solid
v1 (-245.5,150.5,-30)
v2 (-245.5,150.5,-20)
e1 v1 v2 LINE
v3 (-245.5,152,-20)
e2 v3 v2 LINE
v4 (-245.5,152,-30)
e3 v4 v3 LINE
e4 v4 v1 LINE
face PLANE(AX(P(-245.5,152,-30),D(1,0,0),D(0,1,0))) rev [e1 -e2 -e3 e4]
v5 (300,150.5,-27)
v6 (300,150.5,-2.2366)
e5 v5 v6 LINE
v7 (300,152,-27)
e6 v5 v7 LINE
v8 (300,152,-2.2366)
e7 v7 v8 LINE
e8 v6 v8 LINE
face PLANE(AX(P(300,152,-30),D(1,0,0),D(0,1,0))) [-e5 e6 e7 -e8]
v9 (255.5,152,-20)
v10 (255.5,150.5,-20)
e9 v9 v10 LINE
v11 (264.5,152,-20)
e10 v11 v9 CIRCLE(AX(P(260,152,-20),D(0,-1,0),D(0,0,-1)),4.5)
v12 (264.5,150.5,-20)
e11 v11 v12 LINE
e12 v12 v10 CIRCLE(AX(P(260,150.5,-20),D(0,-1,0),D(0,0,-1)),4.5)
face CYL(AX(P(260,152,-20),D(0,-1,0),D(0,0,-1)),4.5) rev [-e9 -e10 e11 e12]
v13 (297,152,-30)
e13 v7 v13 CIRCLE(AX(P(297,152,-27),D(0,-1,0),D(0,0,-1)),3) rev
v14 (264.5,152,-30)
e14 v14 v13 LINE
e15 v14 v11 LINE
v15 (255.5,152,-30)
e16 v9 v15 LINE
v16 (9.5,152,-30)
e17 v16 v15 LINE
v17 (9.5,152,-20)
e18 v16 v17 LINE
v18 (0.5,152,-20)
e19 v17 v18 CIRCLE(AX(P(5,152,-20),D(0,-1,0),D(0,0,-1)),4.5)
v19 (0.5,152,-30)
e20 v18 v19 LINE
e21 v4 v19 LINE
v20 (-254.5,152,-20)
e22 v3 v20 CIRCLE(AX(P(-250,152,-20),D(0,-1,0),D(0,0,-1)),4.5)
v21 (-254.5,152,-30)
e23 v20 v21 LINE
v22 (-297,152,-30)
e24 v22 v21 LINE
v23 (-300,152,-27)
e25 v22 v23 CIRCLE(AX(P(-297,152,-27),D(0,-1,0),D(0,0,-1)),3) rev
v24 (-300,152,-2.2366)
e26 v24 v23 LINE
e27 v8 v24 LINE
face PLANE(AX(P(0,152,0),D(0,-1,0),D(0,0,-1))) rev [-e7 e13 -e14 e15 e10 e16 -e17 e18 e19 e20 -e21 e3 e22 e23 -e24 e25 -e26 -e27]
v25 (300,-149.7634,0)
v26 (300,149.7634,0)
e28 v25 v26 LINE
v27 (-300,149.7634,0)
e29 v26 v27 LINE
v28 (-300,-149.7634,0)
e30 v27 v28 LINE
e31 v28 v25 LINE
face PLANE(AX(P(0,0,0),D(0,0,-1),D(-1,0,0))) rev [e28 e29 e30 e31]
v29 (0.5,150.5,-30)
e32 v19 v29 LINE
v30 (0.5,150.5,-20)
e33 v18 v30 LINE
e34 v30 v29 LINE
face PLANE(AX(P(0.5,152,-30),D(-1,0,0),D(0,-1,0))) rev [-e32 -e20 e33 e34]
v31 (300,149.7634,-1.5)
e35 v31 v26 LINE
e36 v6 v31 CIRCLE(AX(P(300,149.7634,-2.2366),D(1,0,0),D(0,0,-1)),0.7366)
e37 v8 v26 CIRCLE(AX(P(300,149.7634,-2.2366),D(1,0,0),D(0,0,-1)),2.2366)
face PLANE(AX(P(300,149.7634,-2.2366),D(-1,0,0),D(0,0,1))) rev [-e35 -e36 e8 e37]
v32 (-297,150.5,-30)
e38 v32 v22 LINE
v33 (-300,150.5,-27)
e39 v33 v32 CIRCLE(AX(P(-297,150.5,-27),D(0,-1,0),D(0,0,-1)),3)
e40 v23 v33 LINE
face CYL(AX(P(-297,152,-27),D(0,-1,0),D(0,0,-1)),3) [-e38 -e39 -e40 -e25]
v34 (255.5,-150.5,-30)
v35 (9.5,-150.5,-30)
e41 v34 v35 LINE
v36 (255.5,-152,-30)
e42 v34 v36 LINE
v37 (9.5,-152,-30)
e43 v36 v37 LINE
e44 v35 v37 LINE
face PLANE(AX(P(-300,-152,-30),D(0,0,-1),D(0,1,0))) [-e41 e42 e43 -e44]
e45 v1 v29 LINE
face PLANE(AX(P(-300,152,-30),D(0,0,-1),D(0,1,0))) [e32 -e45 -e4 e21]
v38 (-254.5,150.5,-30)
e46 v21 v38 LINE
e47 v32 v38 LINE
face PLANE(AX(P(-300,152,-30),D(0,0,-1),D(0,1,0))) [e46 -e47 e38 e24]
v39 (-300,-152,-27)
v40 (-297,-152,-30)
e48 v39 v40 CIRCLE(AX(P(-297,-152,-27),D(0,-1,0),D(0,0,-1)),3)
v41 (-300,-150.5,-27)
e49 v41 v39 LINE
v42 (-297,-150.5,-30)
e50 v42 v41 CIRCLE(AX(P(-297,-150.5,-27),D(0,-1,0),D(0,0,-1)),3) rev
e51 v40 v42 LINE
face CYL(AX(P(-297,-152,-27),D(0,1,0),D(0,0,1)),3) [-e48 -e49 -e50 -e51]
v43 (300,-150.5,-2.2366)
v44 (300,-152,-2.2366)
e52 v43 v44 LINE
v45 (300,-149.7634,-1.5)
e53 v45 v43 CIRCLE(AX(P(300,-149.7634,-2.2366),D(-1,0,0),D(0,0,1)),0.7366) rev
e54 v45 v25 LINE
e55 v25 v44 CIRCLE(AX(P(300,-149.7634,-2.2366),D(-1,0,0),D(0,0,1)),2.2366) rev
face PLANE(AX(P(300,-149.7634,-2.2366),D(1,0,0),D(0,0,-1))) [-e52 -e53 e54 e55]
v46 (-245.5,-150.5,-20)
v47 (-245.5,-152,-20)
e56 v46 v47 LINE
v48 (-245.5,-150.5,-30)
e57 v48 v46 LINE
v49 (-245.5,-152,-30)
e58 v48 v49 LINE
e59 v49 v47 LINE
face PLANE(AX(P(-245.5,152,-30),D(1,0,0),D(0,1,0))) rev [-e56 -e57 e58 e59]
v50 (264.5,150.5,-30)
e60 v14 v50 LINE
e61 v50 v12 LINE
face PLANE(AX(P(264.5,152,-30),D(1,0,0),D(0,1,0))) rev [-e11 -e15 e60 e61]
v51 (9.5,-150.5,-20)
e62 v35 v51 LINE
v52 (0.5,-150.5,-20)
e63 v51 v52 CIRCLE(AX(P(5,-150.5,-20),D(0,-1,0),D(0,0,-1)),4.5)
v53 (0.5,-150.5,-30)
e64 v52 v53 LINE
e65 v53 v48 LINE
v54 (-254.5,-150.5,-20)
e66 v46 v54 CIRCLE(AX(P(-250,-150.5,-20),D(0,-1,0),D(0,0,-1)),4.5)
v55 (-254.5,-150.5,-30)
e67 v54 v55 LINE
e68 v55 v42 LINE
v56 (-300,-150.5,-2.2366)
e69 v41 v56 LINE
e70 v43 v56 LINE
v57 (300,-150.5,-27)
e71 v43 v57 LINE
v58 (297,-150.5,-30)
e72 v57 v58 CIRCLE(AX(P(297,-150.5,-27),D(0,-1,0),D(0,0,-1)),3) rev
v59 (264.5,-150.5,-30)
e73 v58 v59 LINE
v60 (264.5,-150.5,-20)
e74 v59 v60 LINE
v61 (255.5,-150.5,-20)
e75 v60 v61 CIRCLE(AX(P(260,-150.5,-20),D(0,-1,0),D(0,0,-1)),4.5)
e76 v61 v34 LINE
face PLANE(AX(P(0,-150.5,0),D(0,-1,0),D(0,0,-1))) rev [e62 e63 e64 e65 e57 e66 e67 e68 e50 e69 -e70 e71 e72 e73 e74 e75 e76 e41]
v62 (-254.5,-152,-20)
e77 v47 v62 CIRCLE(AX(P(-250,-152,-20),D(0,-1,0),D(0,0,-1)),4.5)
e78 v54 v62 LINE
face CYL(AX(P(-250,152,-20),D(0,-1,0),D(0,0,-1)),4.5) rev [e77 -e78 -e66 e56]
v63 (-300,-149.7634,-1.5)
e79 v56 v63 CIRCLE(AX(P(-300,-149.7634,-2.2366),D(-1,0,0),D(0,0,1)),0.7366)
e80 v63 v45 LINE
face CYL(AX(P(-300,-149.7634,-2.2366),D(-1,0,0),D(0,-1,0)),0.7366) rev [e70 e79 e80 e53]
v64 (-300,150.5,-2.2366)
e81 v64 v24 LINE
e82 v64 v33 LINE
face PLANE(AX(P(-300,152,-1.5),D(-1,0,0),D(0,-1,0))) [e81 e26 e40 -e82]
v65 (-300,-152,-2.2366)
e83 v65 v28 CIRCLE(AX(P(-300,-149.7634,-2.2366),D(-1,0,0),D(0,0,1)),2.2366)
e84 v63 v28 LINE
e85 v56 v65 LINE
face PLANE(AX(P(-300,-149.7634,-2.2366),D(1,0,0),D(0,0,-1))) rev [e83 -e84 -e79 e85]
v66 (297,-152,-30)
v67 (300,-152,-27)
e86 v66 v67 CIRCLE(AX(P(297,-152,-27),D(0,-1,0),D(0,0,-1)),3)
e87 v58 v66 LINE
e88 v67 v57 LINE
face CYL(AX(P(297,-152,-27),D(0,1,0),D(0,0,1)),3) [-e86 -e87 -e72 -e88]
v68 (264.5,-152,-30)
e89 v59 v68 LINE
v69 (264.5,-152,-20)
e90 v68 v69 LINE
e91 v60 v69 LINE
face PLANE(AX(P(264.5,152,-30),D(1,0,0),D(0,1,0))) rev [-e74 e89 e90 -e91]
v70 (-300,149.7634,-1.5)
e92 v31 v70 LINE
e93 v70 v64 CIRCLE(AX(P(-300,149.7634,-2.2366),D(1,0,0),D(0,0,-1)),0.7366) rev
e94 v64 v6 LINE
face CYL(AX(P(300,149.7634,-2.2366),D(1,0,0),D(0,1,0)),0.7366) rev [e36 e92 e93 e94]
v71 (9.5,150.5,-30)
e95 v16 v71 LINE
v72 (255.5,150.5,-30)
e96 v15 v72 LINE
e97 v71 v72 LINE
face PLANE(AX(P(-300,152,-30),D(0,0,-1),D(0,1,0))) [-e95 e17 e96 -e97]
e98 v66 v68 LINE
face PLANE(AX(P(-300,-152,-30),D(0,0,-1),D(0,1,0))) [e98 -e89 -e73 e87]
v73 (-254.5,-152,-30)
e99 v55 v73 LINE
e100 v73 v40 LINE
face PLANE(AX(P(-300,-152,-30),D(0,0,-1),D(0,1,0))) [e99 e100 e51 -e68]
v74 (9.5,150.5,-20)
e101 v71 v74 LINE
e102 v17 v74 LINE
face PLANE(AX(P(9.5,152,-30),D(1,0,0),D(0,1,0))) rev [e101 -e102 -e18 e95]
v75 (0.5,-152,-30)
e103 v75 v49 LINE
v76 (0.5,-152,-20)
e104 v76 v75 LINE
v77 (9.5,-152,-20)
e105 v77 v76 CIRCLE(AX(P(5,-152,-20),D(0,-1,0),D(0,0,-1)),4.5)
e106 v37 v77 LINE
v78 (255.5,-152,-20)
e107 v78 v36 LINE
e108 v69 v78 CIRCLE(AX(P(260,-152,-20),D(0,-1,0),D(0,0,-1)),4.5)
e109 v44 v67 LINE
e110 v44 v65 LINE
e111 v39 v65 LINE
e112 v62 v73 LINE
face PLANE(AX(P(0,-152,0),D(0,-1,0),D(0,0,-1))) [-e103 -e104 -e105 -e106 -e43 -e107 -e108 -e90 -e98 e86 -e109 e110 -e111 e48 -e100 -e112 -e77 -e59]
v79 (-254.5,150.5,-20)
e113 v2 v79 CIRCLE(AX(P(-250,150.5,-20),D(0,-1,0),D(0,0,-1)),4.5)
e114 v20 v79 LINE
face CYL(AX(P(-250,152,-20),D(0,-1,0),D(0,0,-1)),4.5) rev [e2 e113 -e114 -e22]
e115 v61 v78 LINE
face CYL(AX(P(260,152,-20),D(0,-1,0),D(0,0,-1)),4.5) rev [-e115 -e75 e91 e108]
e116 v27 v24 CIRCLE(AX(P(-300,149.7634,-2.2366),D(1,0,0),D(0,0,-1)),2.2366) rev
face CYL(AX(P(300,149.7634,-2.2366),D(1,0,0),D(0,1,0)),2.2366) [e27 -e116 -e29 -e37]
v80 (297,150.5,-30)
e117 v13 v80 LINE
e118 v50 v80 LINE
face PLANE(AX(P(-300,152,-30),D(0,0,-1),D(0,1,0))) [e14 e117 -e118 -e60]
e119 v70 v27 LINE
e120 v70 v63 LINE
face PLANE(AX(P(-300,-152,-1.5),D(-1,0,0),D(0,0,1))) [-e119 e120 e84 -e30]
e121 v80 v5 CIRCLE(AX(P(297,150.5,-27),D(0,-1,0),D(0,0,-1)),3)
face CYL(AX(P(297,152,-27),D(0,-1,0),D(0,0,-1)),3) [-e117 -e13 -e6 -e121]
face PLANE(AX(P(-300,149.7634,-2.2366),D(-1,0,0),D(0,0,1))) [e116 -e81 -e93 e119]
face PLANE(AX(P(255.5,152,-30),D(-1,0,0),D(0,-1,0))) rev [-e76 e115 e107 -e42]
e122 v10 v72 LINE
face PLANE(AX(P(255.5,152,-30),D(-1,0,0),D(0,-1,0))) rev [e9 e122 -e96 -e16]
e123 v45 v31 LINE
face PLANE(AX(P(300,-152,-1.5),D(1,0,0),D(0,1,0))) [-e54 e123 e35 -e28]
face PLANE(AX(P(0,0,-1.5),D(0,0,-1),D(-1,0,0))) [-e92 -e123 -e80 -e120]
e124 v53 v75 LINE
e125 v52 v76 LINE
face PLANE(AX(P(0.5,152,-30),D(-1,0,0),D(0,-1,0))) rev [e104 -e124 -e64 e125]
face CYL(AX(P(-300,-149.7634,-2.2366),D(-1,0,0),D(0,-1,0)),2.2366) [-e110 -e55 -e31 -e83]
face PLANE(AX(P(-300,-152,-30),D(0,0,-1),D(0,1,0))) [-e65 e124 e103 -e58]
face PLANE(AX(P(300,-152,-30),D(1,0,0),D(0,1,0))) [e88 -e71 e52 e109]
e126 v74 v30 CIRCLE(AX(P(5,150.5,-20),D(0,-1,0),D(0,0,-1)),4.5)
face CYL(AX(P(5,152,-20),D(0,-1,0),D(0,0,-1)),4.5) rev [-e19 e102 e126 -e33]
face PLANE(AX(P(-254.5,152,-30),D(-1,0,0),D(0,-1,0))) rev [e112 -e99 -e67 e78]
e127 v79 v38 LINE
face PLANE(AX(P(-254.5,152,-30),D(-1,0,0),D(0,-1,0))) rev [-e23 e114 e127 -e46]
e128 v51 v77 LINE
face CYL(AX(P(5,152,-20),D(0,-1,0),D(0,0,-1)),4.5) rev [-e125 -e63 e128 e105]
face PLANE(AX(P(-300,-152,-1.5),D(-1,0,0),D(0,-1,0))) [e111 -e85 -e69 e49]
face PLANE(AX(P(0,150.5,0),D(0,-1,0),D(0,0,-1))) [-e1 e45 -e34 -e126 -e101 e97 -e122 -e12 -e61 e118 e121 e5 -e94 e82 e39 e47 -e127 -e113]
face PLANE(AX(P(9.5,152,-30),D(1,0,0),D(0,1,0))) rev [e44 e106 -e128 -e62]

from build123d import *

# Parameters (mm, degrees)
SKETCH_1_W                         = 600
SKETCH_1_H                         = 304
SM_BASE_FLANGE_1_DEPTH             = 1.5
SM_EDGE_FLANGE_1_STRIP_W           = 7.4732
SM_EDGE_FLANGE_1_STRIP_H           = 1.5
SM_EDGE_FLANGE_1_STRIP_CUT_DEPTH   = 600
SM_EDGE_FLANGE_1_STRIP_2_W         = 7.4732
SM_EDGE_FLANGE_1_STRIP_2_H         = 1.5
SM_EDGE_FLANGE_1_STRIP_CUT_2_DEPTH = 600
SM_EDGE_FLANGE_1_DEPTH             = 600
SM_EDGE_FLANGE_1_BEND_DEPTH        = 600
OTHER_START                        = -152
OTHER_1_DEPTH                      = 304
CUT_EXTRUDE_1_DEPTH                = 429.154177838
PATTERN_LINEAR_1_COUNT             = 3
PATTERN_LINEAR_1_PITCH             = 255


# Read off the part's stored shape, not the designer's step: 断开-边角1
# Sheet-metal steps are written as plain solids
with BuildPart() as part:
    # Sketch 1 → 基体-法兰1 (new body)
    with BuildSketch(Plane.XY):
        Rectangle(SKETCH_1_W, SKETCH_1_H)
    extrude(amount=-SM_BASE_FLANGE_1_DEPTH)

    # 边线-法兰1 strip (across the edge) → 边线-法兰1 strip cut (cut)
    with BuildSketch(Plane(origin=(300, -152, -1.5), x_dir=(0, 1, 0), z_dir=(-1, 0, 0))):
        with Locations((-1.5, -0.75)):
            Rectangle(SM_EDGE_FLANGE_1_STRIP_W, SM_EDGE_FLANGE_1_STRIP_H)
    extrude(amount=SM_EDGE_FLANGE_1_STRIP_CUT_DEPTH, mode=Mode.SUBTRACT)

    # 边线-法兰1 strip 2 (across the edge) → 边线-法兰1 strip cut 2 (cut)
    with BuildSketch(Plane(origin=(-300, 152, -1.5), x_dir=(0, -1, 0), z_dir=(1, 0, 0))):
        with Locations((-1.5, -0.75)):
            Rectangle(SM_EDGE_FLANGE_1_STRIP_2_W, SM_EDGE_FLANGE_1_STRIP_2_H)
    extrude(amount=SM_EDGE_FLANGE_1_STRIP_CUT_2_DEPTH, mode=Mode.SUBTRACT)

    # 边线-法兰1 section (across the edge) → 边线-法兰1 (add)
    with BuildSketch(Plane(origin=(300, -152, -1.5), x_dir=(0, 1, 0), z_dir=(-1, 0, 0))):
        with BuildLine():
            Line((0, 0.7366), (0, 28.5))
            Line((0, 28.5), (1.5, 28.5))
            Line((1.5, 28.5), (1.5, 0.7366))
            ThreePointArc((1.5, 0.7366), (1.715745145, 0.215745145), (2.2366, 0))
            Line((2.2366, 0), (2.2366, -1.5))
            ThreePointArc((2.2366, -1.5), (0.655084973, -0.844915027), (0, 0.7366))
        make_face()
    extrude(amount=SM_EDGE_FLANGE_1_DEPTH)

    # 边线-法兰1 section 2 (across the edge) → 边线-法兰1 bend (add)
    with BuildSketch(Plane(origin=(-300, 152, -1.5), x_dir=(0, -1, 0), z_dir=(1, 0, 0))):
        with BuildLine():
            Line((0, 0.7366), (0, 28.5))
            Line((0, 28.5), (1.5, 28.5))
            Line((1.5, 28.5), (1.5, 0.7366))
            ThreePointArc((1.5, 0.7366), (1.715745145, 0.215745145), (2.2366, 0))
            Line((2.2366, 0), (2.2366, -1.5))
            ThreePointArc((2.2366, -1.5), (0.655084973, -0.844915027), (0, 0.7366))
        make_face()
    extrude(amount=SM_EDGE_FLANGE_1_BEND_DEPTH)

    # Other 1 outline → Other 1 (cut)
    with BuildSketch(Plane(origin=(0, 0, 0), x_dir=(1, 0, 0), z_dir=(0, 1, 0)).offset(OTHER_START)):
        with BuildLine():
            Line((-300, 30), (-300, 27))
            ThreePointArc((-300, 27), (-299.121320344, 29.121320344), (-297, 30))
            Line((-297, 30), (-300, 30))
        make_face()
        with BuildLine():
            Line((300, 30), (297, 30))
            ThreePointArc((297, 30), (299.121320344, 29.121320344), (300, 27))
            Line((300, 27), (300, 30))
        make_face()
    extrude(amount=OTHER_1_DEPTH, mode=Mode.SUBTRACT)

    # 草图12 → 切除-拉伸1 (cut, symmetric)
    with BuildSketch(Plane.XZ.offset(152)):
        with BuildLine():
            Line((-254.5, -30), (-254.5, -20))
            ThreePointArc((-254.5, -20), (-250, -15.5), (-245.5, -20))
            Line((-245.5, -20), (-245.5, -30))
            ThreePointArc((-245.5, -30), (-250, -34.5), (-254.5, -30))
        make_face()
    cut_extrude_1 = extrude(amount=CUT_EXTRUDE_1_DEPTH, both=True, mode=Mode.SUBTRACT)

    # 阵列(线性)1: 切除-拉伸1 ×3
    with Locations(*[(i * PATTERN_LINEAR_1_PITCH, 0, 0) for i in range(1, PATTERN_LINEAR_1_COUNT)]):
        add(cut_extrude_1, mode=Mode.SUBTRACT)


solid = part.part
